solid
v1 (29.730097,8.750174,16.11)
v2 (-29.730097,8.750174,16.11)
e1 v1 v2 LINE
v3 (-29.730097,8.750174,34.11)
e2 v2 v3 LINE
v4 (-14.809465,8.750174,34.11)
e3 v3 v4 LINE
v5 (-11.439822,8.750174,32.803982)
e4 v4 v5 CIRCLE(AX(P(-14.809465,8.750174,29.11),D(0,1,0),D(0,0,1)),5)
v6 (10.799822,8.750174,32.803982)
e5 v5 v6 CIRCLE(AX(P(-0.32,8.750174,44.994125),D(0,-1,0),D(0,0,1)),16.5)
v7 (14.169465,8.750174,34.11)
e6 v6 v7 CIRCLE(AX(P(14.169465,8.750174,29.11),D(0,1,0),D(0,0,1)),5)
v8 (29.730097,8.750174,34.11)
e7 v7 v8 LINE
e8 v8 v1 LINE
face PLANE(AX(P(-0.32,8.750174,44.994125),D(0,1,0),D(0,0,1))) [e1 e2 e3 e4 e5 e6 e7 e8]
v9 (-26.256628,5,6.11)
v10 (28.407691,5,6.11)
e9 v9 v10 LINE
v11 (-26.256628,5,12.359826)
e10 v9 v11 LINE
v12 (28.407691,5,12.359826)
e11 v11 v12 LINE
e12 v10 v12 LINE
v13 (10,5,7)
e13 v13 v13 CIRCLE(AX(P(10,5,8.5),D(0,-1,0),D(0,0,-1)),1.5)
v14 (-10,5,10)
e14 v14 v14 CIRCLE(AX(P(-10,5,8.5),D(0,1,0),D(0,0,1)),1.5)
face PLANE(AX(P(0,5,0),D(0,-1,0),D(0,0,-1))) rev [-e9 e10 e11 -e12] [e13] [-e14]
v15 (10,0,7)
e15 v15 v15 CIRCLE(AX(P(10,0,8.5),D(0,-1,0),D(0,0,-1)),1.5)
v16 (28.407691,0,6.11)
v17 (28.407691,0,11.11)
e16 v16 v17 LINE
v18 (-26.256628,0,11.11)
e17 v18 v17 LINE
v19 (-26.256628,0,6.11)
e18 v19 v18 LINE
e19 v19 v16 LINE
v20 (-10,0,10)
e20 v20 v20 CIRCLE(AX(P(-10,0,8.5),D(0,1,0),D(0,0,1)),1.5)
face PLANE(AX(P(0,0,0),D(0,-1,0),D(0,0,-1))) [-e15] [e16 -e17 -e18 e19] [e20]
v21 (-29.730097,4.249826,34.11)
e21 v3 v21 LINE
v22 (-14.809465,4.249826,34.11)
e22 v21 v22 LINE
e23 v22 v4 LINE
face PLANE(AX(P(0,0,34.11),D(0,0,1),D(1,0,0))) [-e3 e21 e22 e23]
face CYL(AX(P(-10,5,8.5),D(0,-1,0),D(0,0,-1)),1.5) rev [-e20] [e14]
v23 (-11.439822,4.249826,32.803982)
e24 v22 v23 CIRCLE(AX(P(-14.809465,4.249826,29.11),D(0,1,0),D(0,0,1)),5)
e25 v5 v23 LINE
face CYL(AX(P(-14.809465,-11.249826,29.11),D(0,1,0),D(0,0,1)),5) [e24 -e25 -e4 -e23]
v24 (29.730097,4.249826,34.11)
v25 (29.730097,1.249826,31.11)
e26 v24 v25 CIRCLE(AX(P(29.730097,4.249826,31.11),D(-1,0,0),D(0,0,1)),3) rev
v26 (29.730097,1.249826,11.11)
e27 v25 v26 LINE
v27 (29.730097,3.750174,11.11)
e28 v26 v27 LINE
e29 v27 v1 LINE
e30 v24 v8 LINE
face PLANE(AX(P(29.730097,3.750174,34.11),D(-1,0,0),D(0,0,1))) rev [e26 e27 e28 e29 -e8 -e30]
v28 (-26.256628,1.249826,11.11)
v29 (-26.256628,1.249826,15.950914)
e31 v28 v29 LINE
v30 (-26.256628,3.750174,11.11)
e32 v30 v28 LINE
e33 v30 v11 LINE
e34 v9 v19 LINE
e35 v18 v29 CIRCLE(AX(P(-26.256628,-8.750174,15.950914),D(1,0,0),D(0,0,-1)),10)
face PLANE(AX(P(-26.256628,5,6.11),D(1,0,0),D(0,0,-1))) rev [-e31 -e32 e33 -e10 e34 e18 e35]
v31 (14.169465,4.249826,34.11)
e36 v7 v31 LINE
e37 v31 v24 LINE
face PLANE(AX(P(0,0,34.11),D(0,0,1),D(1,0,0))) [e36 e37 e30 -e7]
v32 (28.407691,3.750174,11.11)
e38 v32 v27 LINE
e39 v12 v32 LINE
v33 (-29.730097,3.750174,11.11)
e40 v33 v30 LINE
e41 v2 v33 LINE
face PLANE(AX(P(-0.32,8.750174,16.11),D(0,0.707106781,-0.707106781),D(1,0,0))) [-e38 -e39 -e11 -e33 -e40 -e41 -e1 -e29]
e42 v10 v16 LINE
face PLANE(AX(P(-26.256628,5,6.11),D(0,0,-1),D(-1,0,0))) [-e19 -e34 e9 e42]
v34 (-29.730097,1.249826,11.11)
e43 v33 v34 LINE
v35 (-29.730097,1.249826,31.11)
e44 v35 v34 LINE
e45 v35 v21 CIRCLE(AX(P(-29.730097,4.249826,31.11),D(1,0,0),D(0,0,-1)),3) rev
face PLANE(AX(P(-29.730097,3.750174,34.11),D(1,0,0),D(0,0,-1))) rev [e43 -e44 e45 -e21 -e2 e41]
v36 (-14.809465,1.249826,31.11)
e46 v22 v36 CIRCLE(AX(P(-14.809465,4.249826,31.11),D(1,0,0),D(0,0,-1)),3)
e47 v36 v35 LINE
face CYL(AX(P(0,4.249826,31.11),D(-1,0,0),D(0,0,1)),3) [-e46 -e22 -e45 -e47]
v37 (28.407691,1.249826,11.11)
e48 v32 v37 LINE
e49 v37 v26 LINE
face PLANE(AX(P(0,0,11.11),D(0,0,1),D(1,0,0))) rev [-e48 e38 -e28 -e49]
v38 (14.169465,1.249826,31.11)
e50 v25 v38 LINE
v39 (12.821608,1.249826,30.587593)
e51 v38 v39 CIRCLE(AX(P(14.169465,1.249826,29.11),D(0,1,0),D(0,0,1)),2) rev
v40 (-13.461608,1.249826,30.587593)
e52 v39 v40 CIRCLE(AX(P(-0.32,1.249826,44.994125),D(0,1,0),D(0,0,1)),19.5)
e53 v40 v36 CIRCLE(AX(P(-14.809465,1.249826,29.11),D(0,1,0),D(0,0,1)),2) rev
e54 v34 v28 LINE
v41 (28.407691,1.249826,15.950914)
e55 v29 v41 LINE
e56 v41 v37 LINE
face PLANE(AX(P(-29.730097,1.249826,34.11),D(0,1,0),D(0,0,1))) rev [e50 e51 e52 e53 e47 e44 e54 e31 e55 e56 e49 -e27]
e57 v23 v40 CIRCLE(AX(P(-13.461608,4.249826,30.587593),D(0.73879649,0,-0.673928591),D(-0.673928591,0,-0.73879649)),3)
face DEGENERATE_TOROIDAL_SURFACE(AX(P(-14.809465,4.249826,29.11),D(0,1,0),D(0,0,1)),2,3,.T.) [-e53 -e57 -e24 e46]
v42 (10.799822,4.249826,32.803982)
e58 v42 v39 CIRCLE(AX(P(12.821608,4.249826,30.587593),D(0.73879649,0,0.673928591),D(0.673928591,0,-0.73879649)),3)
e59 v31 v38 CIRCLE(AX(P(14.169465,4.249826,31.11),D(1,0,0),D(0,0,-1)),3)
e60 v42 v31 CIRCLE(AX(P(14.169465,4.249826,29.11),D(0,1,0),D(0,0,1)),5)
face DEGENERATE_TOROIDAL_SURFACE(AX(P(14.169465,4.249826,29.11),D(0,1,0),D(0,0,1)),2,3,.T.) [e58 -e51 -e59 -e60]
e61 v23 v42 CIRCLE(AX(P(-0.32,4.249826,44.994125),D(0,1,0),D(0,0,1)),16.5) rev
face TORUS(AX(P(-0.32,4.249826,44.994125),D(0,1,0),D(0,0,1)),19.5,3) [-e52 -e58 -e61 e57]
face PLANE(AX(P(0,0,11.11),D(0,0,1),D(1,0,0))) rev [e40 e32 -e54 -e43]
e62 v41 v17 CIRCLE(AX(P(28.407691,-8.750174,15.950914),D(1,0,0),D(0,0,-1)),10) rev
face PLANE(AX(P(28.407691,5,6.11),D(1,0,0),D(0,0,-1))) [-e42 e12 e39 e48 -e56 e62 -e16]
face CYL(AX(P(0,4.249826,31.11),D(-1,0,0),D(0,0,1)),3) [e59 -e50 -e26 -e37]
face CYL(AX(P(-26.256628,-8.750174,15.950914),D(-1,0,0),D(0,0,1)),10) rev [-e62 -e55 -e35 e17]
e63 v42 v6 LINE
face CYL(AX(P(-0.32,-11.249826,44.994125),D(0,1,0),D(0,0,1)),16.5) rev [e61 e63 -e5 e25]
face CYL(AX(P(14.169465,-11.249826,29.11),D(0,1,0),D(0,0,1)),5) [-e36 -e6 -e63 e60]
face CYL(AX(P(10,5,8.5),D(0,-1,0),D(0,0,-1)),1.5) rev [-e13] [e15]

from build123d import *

# Parameters (mm, degrees)
SKETCH_1_W          = 54.664318292
SKETCH_1_H          = 5
SKETCH_1_R          = 1.5
EXTRUDE_1_DEPTH     = 5
SKETCH_2_W          = 59.460193076
SKETCH_2_H          = 2.500348526
EXTRUDE_2_DEPTH     = 23
SKETCH_5_R          = 16.5
CUT_EXTRUDE_1_DEPTH = 15
EXTRUDE_START       = 5
EXTRUDE_3_DEPTH     = 5
CHAMFER_1_SIZE      = 5
FILLET_6_R          = 10
FILLET_7_R          = 5
FILLET_8_R          = 3


with BuildPart() as part:
    # 草图1 → 凸台-拉伸1 (new body)
    with BuildSketch(Plane(origin=(0, 0, 0), x_dir=(1, 0, 0), z_dir=(0, 1, 0))):
        with Locations((1.075531559, -8.61)):
            Rectangle(SKETCH_1_W, SKETCH_1_H)
        with Locations(Location((-10, -8.5, 0), (0, 0, 270))):
            Circle(SKETCH_1_R, mode=Mode.SUBTRACT)
        with Locations(Location((10, -8.5, 0), (0, 0, 90))):
            Circle(SKETCH_1_R, mode=Mode.SUBTRACT)
    extrude(amount=EXTRUDE_1_DEPTH)

    # 草图2 → 凸台-拉伸2 (add)
    with BuildSketch(Plane.XY.offset(11.11)):
        with Locations((0, 2.5)):
            Rectangle(SKETCH_2_W, SKETCH_2_H)
    extrude(amount=EXTRUDE_2_DEPTH)

    # 草图5 → 切除-拉伸1 (cut)
    with BuildSketch(Plane(origin=(0, 3.750174263, 0), x_dir=(1, 0, 0), z_dir=(0, 1, 0))):
        with Locations((-0.32, -44.994124541)):
            Circle(SKETCH_5_R)
    extrude(amount=-CUT_EXTRUDE_1_DEPTH, mode=Mode.SUBTRACT)

    # 草图7 → 凸台-拉伸3 (add)
    with BuildSketch(Plane(origin=(0, 3.750174263, 0), x_dir=(1, 0, 0), z_dir=(0, 1, 0)).offset(EXTRUDE_START)):
        with BuildLine():
            Line((-29.730096538, -34.11), (-12.721041608, -34.11))
            ThreePointArc((-12.721041608, -34.11), (-0.32, -28.494124541), (12.081041608, -34.11))
            Line((12.081041608, -34.11), (29.730096538, -34.11))
            Line((29.730096538, -34.11), (29.730096538, -11.11))
            Line((29.730096538, -11.11), (28.407690705, -11.11))
            Line((28.407690705, -11.11), (-26.256627587, -11.11))
            Line((-26.256627587, -11.11), (-29.730096538, -11.11))
            Line((-29.730096538, -11.11), (-29.730096538, -34.11))
        make_face()
    extrude(amount=-EXTRUDE_3_DEPTH)

    # 倒角1
    # the kernel refuses this chamfer: 5 mm, written as the material it takes off along each edge
    with BuildSketch(Plane(origin=(-42.588511478, 8.750174263, 11.11), x_dir=(0, -0.9996219169112968, -0.027495876610586317), z_dir=(1, 0, 0))) as chamfer_1_piece_1_section:
        Polygon((CHAMFER_1_SIZE * 0.999621916911, -CHAMFER_1_SIZE * 0.0274958766106), (-CHAMFER_1_SIZE * 0.0274958766106, -CHAMFER_1_SIZE * 0.999621916911), (0, 0), align=None)
    chamfer_1_piece_1 = extrude(amount=85.177022955, mode=Mode.PRIVATE)
    chamfer_1_piece_1 = split(chamfer_1_piece_1, bisect_by=Plane(origin=(-34.422569532, 5, 11.399404242), z_dir=(0, -1, 0)), keep=Keep.TOP, mode=Mode.PRIVATE)
    chamfer_1_piece_1 = split(chamfer_1_piece_1, bisect_by=Plane(origin=(-26.256627587, 4.506210637, 11.399404242), z_dir=(-1, 0, 0)), keep=Keep.TOP, mode=Mode.PRIVATE)
    add(chamfer_1_piece_1, mode=Mode.SUBTRACT)
    with BuildSketch(Plane(origin=(-42.588511478, 8.750174263, 11.11), x_dir=(0, -0.9996219169112968, -0.027495876610586317), z_dir=(1, 0, 0))) as chamfer_1_piece_2_section:
        Polygon((CHAMFER_1_SIZE * 0.999621916911, -CHAMFER_1_SIZE * 0.0274958766106), (-CHAMFER_1_SIZE * 0.0274958766106, -CHAMFER_1_SIZE * 0.999621916911), (0, 0), align=None)
    chamfer_1_piece_2 = extrude(amount=85.177022955, mode=Mode.PRIVATE)
    chamfer_1_piece_2 = split(chamfer_1_piece_2, bisect_by=Plane(origin=(-34.422569532, 5, 12.869772417), z_dir=(0, 1, 0)), keep=Keep.TOP, mode=Mode.PRIVATE)
    chamfer_1_piece_2 = split(chamfer_1_piece_2, bisect_by=Plane(origin=(-26.256627587, 7.312697929, 12.869772417), z_dir=(-1, 0, 0)), keep=Keep.TOP, mode=Mode.PRIVATE)
    add(chamfer_1_piece_2, mode=Mode.SUBTRACT)
    with BuildSketch(Plane(origin=(-42.588511478, 8.750174263, 11.11), x_dir=(0, -0.9996219169112968, -0.027495876610586317), z_dir=(1, 0, 0))) as chamfer_1_piece_3_section:
        Polygon((CHAMFER_1_SIZE * 0.999621916911, -CHAMFER_1_SIZE * 0.0274958766106), (-CHAMFER_1_SIZE * 0.0274958766106, -CHAMFER_1_SIZE * 0.999621916911), (0, 0), align=None)
    chamfer_1_piece_3 = extrude(amount=85.177022955, mode=Mode.PRIVATE)
    chamfer_1_piece_3 = split(chamfer_1_piece_3, bisect_by=Plane(origin=(1.075531559, 5, 12.869772417), z_dir=(0, 1, 0)), keep=Keep.TOP, mode=Mode.PRIVATE)
    chamfer_1_piece_3 = split(chamfer_1_piece_3, bisect_by=Plane(origin=(28.407690705, 7.312697929, 12.869772417), z_dir=(-1, 0, 0)), keep=Keep.TOP, mode=Mode.PRIVATE)
    chamfer_1_piece_3 = split(chamfer_1_piece_3, bisect_by=Plane(origin=(-26.256627587, 7.312697929, 12.869772417), z_dir=(1, 0, 0)), keep=Keep.TOP, mode=Mode.PRIVATE)
    add(chamfer_1_piece_3, mode=Mode.SUBTRACT)
    with BuildSketch(Plane(origin=(-42.588511478, 8.750174263, 11.11), x_dir=(0, -0.9996219169112968, -0.027495876610586317), z_dir=(1, 0, 0))) as chamfer_1_piece_4_section:
        Polygon((CHAMFER_1_SIZE * 0.999621916911, -CHAMFER_1_SIZE * 0.0274958766106), (-CHAMFER_1_SIZE * 0.0274958766106, -CHAMFER_1_SIZE * 0.999621916911), (0, 0), align=None)
    chamfer_1_piece_4 = extrude(amount=85.177022955, mode=Mode.PRIVATE)
    chamfer_1_piece_4 = split(chamfer_1_piece_4, bisect_by=Plane(origin=(35.498101091, 5, 11.399404242), z_dir=(0, -1, 0)), keep=Keep.TOP, mode=Mode.PRIVATE)
    chamfer_1_piece_4 = split(chamfer_1_piece_4, bisect_by=Plane(origin=(28.407690705, 4.506210637, 11.399404242), z_dir=(1, 0, 0)), keep=Keep.TOP, mode=Mode.PRIVATE)
    add(chamfer_1_piece_4, mode=Mode.SUBTRACT)
    with BuildSketch(Plane(origin=(-42.588511478, 8.750174263, 11.11), x_dir=(0, -0.9996219169112968, -0.027495876610586317), z_dir=(1, 0, 0))) as chamfer_1_piece_5_section:
        Polygon((CHAMFER_1_SIZE * 0.999621916911, -CHAMFER_1_SIZE * 0.0274958766106), (-CHAMFER_1_SIZE * 0.0274958766106, -CHAMFER_1_SIZE * 0.999621916911), (0, 0), align=None)
    chamfer_1_piece_5 = extrude(amount=85.177022955, mode=Mode.PRIVATE)
    chamfer_1_piece_5 = split(chamfer_1_piece_5, bisect_by=Plane(origin=(35.498101091, 5, 12.869772417), z_dir=(0, 1, 0)), keep=Keep.TOP, mode=Mode.PRIVATE)
    chamfer_1_piece_5 = split(chamfer_1_piece_5, bisect_by=Plane(origin=(28.407690705, 7.312697929, 12.869772417), z_dir=(1, 0, 0)), keep=Keep.TOP, mode=Mode.PRIVATE)
    add(chamfer_1_piece_5, mode=Mode.SUBTRACT)

    # 圆角6
    # the kernel refuses this fillet: 10 mm, written as the material it adds along each edge
    with BuildSketch(Plane(origin=(28.407690705, 1.249825737, 11.11), x_dir=(0, 0, 1), z_dir=(-1, 0, 0))) as fillet_6_piece_1:
        with BuildLine():
            CenterArc((4.840914208, -10), FILLET_6_R, 90, 28.952961909)
            Line((0, -1.249825737), (0, 0))
            Line((0, 0), (4.840914208, 0))
        make_face()
    extrude(amount=54.664318292)

    # 圆角7
    fillet_7_edges = [part.edges().sort_by_distance(p)[0] for p in [
        (-12.721041608, 5, 34.11),
        (12.081041608, 5, 34.11),
    ]]
    fillet(fillet_7_edges, radius=FILLET_7_R)

    # 圆角8
    fillet_8_edges = [part.edges().sort_by_distance(p)[0] for p in [
        (-0.32, 1.249825737, 28.494124541),
        (21.949780623, 1.249825737, 34.11),
        (-13.002521469, 1.249825737, 33.772076375),
        (12.362521469, 1.249825737, 33.772076375),
        (-22.269780623, 1.249825737, 34.11),
    ]]
    fillet(fillet_8_edges, radius=FILLET_8_R)


solid = part.part
